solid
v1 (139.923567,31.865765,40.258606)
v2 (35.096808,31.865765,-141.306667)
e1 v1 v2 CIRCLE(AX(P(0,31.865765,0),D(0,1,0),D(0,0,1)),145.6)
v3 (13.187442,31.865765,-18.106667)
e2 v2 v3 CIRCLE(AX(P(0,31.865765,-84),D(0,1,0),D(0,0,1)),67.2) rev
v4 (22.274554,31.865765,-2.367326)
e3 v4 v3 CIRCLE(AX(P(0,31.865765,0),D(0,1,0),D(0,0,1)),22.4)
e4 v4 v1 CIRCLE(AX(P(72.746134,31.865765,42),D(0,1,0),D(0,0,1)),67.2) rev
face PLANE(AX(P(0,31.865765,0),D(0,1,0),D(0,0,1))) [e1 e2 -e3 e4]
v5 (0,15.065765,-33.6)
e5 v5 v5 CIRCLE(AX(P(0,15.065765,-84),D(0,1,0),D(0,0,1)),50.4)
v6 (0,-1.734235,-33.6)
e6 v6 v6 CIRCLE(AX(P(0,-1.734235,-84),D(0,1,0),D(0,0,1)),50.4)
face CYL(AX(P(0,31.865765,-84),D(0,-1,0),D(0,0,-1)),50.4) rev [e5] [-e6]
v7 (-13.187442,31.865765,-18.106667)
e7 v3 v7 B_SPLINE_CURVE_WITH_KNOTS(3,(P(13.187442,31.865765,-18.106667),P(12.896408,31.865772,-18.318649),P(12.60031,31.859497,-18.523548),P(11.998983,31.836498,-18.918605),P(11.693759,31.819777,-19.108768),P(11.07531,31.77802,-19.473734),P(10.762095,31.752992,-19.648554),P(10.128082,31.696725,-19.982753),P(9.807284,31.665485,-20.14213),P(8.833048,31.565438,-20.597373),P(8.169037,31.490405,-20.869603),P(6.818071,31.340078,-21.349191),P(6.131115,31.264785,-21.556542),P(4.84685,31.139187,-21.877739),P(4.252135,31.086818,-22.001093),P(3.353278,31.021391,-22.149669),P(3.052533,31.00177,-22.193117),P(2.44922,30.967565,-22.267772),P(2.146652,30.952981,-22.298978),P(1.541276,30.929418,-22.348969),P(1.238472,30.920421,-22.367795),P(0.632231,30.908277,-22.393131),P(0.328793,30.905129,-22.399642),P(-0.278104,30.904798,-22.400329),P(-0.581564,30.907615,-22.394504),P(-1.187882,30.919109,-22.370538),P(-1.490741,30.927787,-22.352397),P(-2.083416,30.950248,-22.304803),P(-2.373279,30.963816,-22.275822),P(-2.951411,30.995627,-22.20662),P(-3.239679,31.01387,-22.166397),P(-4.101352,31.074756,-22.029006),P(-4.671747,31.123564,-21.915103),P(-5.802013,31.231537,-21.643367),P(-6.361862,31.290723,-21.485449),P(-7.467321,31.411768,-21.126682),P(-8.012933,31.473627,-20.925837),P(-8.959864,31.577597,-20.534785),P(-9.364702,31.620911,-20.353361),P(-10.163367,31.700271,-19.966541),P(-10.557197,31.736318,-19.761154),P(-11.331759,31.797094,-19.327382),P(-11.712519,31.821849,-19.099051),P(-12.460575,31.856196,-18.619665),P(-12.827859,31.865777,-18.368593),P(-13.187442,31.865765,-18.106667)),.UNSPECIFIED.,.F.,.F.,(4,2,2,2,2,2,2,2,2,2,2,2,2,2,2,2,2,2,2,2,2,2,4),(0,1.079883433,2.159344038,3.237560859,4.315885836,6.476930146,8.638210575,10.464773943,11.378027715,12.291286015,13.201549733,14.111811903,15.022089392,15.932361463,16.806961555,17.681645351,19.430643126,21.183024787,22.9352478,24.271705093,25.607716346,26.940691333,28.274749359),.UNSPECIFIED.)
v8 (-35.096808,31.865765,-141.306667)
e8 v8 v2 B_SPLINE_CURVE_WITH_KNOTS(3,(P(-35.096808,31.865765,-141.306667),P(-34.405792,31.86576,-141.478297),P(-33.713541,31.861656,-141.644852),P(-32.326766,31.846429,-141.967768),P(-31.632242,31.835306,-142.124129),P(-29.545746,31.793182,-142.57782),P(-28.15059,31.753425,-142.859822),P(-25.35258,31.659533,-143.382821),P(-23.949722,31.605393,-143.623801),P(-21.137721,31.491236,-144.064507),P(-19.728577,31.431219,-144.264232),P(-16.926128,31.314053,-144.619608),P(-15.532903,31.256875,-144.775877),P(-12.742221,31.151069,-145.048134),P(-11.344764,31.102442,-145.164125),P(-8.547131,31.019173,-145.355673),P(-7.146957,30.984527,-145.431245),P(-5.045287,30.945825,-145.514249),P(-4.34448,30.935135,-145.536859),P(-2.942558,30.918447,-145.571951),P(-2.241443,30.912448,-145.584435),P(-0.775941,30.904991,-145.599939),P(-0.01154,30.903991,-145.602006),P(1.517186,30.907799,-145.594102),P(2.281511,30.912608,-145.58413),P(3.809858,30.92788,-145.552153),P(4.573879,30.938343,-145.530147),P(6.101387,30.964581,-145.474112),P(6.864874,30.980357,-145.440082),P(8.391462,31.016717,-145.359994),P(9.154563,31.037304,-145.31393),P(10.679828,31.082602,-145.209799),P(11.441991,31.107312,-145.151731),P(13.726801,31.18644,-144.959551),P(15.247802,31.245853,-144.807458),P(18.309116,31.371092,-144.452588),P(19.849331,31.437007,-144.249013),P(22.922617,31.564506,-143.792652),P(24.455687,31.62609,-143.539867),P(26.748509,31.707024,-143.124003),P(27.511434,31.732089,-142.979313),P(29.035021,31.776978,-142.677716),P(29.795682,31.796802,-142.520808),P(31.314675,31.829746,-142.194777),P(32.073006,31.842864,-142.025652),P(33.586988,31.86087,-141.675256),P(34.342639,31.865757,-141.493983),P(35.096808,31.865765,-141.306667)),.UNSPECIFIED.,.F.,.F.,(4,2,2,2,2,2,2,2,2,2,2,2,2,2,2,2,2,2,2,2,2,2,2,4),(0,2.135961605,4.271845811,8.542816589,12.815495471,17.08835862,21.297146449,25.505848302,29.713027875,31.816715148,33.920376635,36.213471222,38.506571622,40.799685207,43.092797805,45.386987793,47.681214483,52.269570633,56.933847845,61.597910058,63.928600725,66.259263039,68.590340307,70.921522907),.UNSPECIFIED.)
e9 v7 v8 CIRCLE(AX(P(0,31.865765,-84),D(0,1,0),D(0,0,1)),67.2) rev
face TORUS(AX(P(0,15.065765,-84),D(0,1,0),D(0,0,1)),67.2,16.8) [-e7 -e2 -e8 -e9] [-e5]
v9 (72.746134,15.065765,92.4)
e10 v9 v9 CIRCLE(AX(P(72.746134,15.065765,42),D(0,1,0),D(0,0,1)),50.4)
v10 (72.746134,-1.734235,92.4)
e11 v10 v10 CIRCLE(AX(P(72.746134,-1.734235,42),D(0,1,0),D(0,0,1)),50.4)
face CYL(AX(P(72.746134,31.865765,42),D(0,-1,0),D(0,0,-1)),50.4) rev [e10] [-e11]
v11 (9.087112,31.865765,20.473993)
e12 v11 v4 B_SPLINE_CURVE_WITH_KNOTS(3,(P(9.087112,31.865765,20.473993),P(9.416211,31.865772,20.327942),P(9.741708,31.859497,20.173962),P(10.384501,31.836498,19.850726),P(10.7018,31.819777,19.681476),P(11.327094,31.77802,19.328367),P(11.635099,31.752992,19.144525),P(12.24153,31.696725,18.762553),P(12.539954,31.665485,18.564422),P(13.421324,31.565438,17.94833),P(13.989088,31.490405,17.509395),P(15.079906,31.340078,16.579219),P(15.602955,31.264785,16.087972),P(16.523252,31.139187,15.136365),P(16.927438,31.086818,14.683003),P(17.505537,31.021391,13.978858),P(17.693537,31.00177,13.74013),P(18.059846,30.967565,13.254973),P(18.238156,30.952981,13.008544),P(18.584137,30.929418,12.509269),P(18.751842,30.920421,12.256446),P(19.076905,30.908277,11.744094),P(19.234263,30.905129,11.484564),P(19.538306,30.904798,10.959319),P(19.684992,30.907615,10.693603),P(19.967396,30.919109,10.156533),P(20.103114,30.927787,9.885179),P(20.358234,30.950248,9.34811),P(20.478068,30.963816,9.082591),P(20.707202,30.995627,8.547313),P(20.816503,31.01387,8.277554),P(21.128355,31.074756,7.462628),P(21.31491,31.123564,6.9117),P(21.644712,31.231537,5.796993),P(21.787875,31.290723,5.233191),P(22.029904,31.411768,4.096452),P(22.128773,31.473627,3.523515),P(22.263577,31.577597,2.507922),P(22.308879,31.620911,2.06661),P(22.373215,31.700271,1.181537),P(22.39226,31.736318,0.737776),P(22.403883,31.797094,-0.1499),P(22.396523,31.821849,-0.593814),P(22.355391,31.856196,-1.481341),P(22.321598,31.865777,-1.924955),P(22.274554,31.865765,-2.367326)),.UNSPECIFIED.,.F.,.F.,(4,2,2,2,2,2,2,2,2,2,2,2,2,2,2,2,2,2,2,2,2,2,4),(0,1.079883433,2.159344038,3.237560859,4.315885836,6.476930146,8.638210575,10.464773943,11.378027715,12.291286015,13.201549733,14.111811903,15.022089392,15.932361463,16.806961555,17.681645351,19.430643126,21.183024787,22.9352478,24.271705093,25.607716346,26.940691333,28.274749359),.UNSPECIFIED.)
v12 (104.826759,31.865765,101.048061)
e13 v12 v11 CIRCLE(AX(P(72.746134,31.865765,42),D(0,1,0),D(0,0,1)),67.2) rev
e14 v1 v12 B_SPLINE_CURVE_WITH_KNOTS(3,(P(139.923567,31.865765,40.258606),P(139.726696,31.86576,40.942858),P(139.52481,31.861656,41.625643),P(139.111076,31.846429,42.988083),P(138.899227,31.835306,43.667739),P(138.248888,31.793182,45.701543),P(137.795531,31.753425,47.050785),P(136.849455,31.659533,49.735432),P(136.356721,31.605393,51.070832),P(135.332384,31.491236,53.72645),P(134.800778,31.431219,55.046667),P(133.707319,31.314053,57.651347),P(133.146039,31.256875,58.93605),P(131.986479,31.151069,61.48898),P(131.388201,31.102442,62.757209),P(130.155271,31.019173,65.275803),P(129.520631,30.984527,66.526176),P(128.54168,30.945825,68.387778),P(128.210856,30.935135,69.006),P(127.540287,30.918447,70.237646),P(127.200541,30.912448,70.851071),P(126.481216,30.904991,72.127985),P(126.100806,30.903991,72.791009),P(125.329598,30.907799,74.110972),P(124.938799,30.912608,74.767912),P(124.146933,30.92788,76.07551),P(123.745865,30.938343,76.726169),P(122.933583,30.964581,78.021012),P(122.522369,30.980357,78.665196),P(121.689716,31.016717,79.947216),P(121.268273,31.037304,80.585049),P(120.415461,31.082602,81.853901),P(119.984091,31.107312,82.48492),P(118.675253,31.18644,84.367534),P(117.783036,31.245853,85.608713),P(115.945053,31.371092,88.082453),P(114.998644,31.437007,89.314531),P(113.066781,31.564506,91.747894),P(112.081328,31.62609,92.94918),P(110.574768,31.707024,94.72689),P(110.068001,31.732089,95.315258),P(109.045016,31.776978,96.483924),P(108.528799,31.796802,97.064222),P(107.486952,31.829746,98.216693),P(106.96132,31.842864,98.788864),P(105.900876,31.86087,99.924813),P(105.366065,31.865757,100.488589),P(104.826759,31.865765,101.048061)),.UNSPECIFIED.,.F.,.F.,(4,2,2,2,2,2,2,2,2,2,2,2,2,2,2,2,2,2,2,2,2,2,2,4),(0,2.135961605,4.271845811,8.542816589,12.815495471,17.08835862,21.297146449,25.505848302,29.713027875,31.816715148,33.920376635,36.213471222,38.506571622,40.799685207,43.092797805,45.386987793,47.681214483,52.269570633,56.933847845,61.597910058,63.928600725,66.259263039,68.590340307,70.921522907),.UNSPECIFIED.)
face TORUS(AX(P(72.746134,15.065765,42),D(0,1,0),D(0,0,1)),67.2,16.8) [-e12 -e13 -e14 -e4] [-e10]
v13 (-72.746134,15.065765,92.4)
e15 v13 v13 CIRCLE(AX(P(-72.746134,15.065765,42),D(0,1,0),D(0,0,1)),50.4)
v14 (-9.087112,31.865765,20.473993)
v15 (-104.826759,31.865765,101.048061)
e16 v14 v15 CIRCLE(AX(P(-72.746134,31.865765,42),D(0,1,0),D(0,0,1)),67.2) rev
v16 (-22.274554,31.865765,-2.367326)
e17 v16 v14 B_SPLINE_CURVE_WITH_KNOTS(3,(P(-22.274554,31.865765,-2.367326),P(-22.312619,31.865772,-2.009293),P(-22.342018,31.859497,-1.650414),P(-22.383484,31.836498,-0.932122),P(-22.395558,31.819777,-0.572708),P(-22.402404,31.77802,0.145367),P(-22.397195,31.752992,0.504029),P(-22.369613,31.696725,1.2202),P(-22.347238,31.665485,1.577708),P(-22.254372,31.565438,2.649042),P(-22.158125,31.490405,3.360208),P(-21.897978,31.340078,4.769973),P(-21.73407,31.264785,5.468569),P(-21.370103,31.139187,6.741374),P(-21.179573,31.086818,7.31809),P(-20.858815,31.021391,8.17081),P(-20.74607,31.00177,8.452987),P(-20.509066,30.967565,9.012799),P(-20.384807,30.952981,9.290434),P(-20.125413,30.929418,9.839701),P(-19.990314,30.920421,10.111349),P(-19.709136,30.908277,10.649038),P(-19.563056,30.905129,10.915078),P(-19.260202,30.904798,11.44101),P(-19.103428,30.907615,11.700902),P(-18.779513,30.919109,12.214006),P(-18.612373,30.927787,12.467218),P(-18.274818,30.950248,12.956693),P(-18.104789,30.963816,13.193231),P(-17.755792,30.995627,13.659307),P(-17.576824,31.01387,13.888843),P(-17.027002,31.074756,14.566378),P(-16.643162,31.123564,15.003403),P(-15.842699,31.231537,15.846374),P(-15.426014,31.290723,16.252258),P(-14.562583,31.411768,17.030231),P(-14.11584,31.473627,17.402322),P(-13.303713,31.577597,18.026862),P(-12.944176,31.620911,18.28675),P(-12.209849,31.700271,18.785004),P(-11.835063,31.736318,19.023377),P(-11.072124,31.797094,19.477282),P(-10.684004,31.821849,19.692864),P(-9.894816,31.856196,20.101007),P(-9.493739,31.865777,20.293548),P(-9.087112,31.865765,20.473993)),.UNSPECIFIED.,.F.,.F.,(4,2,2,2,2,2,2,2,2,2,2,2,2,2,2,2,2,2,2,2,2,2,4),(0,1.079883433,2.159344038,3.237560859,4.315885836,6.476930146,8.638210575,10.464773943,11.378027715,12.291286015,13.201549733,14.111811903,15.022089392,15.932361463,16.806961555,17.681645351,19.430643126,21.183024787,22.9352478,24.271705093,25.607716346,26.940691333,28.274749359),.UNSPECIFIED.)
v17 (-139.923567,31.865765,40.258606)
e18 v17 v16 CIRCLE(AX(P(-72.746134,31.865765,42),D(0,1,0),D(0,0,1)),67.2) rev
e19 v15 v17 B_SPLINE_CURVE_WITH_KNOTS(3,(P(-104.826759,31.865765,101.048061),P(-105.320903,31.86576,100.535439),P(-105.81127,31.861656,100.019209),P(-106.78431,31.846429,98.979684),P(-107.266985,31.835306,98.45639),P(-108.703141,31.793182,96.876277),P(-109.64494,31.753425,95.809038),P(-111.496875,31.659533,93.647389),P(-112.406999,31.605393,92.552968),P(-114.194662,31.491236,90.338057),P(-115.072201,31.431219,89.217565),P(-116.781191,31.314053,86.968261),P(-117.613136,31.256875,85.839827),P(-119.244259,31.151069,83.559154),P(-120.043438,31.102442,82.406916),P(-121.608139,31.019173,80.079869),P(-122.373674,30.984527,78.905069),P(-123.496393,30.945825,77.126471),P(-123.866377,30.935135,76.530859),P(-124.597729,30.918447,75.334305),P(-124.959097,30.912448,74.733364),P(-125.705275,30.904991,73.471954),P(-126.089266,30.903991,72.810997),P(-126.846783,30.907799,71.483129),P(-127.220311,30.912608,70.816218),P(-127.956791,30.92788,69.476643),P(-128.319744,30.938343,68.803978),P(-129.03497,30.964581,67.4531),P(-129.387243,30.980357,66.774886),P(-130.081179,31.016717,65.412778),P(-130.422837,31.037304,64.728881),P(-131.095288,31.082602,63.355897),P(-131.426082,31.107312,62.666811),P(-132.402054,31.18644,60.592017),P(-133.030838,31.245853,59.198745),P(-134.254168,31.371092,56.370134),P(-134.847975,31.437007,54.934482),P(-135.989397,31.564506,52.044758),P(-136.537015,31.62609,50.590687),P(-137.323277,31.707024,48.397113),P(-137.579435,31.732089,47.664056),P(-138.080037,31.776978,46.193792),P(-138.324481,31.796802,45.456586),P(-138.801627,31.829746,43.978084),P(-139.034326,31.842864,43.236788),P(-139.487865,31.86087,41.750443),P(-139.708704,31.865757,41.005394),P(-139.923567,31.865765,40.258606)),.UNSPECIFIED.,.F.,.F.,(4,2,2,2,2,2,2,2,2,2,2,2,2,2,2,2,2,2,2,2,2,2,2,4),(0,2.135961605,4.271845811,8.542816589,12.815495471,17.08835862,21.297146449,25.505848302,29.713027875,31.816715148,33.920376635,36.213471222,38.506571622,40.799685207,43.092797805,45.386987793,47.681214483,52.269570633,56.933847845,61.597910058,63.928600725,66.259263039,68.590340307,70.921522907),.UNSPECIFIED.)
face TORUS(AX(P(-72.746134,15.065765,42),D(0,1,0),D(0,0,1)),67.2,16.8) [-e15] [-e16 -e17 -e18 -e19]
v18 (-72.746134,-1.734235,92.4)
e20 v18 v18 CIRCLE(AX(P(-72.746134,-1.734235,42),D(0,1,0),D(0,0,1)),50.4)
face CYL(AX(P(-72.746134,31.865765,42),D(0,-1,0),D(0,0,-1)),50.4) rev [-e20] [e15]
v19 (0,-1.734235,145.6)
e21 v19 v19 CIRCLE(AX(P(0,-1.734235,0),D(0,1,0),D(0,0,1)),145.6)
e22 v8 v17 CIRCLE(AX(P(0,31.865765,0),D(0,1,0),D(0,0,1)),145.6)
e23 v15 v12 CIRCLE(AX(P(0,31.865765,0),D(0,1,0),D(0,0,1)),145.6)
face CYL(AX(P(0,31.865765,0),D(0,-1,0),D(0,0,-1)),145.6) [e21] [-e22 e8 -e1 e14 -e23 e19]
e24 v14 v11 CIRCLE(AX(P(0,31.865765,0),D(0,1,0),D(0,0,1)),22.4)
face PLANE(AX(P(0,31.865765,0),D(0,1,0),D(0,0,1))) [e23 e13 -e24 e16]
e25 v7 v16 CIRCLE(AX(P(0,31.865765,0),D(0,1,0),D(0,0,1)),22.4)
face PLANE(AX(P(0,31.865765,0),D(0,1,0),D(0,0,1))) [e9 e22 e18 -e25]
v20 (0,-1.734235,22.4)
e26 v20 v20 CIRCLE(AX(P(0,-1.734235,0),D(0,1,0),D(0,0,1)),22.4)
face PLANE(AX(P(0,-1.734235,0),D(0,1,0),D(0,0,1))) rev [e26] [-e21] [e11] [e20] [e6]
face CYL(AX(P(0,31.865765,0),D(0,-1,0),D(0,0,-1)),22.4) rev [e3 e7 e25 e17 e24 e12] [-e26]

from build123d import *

# Parameters (mm, degrees)
SKETCH2_R           = 130
SKETCH2_R_2         = 45
SKETCH2_R_3         = 20
BOSS_EXTRUDE2_DEPTH = 30
FILLET1_R           = 15
SCALE1_SCALE        = 1.12


with BuildPart() as part:
    # Sketch2 → Boss-Extrude2 (new body)
    with BuildSketch(Plane(origin=(0, 0, 0), x_dir=(1, 0, 0), z_dir=(0, 1, 0))):
        with Locations(Location((0, 0, 0), (0, 0, 270))):
            Circle(SKETCH2_R)
        with Locations(Location((0, 75, 0), (0, 0, 270))):
            Circle(SKETCH2_R_2, mode=Mode.SUBTRACT)
        with Locations(Location((64.951905284, -37.5, 0), (0, 0, 270))):
            Circle(SKETCH2_R_2, mode=Mode.SUBTRACT)
        with Locations(Location((-64.951905284, -37.5, 0), (0, 0, 270))):
            Circle(SKETCH2_R_2, mode=Mode.SUBTRACT)
        with Locations(Location((0, 0, 0), (0, 0, 270))):
            Circle(SKETCH2_R_3, mode=Mode.SUBTRACT)
    extrude(amount=BOSS_EXTRUDE2_DEPTH)

    # Fillet1
    # the kernel refuses this fillet: 15 mm, written as the material it takes off along each edge
    with BuildSketch(Plane(origin=(64.951905284, 30, 37.5), x_dir=(0, 0, 1), z_dir=(-1, 0, 0))) as fillet1_piece_1:
        with BuildLine():
            CenterArc((45 + FILLET1_R, -FILLET1_R), FILLET1_R, 90, 90)
            Line((45 + FILLET1_R, 0), (45, 0))
            Line((45, 0), (45, -FILLET1_R))
        make_face()
    revolve(axis=Axis((64.951905284, 30, 37.5), (0, 1, 0)), mode=Mode.SUBTRACT)
    with BuildSketch(Plane(origin=(-64.951905284, 30, 37.5), x_dir=(0, 0, 1), z_dir=(-1, 0, 0))) as fillet1_piece_2:
        with BuildLine():
            CenterArc((45 + FILLET1_R, -FILLET1_R), FILLET1_R, 90, 90)
            Line((45 + FILLET1_R, 0), (45, 0))
            Line((45, 0), (45, -FILLET1_R))
        make_face()
    revolve(axis=Axis((-64.951905284, 30, 37.5), (0, 1, 0)), mode=Mode.SUBTRACT)
    with BuildSketch(Plane(origin=(0, 30, -75), x_dir=(0, 0, 1), z_dir=(-1, 0, 0))) as fillet1_piece_3:
        with BuildLine():
            CenterArc((45 + FILLET1_R, -FILLET1_R), FILLET1_R, 90, 90)
            Line((45 + FILLET1_R, 0), (45, 0))
            Line((45, 0), (45, -FILLET1_R))
        make_face()
    revolve(axis=Axis((0, 30, -75), (0, 1, 0)), mode=Mode.SUBTRACT)


with BuildPart() as part_1:
    # Scale1: scaled about (7.8e-08, 14.452007368, -8e-08)
    add(part.part.scale(SCALE1_SCALE).moved(Location((-9e-09, -1.734240884, 1e-08))))


solid = part_1.part
